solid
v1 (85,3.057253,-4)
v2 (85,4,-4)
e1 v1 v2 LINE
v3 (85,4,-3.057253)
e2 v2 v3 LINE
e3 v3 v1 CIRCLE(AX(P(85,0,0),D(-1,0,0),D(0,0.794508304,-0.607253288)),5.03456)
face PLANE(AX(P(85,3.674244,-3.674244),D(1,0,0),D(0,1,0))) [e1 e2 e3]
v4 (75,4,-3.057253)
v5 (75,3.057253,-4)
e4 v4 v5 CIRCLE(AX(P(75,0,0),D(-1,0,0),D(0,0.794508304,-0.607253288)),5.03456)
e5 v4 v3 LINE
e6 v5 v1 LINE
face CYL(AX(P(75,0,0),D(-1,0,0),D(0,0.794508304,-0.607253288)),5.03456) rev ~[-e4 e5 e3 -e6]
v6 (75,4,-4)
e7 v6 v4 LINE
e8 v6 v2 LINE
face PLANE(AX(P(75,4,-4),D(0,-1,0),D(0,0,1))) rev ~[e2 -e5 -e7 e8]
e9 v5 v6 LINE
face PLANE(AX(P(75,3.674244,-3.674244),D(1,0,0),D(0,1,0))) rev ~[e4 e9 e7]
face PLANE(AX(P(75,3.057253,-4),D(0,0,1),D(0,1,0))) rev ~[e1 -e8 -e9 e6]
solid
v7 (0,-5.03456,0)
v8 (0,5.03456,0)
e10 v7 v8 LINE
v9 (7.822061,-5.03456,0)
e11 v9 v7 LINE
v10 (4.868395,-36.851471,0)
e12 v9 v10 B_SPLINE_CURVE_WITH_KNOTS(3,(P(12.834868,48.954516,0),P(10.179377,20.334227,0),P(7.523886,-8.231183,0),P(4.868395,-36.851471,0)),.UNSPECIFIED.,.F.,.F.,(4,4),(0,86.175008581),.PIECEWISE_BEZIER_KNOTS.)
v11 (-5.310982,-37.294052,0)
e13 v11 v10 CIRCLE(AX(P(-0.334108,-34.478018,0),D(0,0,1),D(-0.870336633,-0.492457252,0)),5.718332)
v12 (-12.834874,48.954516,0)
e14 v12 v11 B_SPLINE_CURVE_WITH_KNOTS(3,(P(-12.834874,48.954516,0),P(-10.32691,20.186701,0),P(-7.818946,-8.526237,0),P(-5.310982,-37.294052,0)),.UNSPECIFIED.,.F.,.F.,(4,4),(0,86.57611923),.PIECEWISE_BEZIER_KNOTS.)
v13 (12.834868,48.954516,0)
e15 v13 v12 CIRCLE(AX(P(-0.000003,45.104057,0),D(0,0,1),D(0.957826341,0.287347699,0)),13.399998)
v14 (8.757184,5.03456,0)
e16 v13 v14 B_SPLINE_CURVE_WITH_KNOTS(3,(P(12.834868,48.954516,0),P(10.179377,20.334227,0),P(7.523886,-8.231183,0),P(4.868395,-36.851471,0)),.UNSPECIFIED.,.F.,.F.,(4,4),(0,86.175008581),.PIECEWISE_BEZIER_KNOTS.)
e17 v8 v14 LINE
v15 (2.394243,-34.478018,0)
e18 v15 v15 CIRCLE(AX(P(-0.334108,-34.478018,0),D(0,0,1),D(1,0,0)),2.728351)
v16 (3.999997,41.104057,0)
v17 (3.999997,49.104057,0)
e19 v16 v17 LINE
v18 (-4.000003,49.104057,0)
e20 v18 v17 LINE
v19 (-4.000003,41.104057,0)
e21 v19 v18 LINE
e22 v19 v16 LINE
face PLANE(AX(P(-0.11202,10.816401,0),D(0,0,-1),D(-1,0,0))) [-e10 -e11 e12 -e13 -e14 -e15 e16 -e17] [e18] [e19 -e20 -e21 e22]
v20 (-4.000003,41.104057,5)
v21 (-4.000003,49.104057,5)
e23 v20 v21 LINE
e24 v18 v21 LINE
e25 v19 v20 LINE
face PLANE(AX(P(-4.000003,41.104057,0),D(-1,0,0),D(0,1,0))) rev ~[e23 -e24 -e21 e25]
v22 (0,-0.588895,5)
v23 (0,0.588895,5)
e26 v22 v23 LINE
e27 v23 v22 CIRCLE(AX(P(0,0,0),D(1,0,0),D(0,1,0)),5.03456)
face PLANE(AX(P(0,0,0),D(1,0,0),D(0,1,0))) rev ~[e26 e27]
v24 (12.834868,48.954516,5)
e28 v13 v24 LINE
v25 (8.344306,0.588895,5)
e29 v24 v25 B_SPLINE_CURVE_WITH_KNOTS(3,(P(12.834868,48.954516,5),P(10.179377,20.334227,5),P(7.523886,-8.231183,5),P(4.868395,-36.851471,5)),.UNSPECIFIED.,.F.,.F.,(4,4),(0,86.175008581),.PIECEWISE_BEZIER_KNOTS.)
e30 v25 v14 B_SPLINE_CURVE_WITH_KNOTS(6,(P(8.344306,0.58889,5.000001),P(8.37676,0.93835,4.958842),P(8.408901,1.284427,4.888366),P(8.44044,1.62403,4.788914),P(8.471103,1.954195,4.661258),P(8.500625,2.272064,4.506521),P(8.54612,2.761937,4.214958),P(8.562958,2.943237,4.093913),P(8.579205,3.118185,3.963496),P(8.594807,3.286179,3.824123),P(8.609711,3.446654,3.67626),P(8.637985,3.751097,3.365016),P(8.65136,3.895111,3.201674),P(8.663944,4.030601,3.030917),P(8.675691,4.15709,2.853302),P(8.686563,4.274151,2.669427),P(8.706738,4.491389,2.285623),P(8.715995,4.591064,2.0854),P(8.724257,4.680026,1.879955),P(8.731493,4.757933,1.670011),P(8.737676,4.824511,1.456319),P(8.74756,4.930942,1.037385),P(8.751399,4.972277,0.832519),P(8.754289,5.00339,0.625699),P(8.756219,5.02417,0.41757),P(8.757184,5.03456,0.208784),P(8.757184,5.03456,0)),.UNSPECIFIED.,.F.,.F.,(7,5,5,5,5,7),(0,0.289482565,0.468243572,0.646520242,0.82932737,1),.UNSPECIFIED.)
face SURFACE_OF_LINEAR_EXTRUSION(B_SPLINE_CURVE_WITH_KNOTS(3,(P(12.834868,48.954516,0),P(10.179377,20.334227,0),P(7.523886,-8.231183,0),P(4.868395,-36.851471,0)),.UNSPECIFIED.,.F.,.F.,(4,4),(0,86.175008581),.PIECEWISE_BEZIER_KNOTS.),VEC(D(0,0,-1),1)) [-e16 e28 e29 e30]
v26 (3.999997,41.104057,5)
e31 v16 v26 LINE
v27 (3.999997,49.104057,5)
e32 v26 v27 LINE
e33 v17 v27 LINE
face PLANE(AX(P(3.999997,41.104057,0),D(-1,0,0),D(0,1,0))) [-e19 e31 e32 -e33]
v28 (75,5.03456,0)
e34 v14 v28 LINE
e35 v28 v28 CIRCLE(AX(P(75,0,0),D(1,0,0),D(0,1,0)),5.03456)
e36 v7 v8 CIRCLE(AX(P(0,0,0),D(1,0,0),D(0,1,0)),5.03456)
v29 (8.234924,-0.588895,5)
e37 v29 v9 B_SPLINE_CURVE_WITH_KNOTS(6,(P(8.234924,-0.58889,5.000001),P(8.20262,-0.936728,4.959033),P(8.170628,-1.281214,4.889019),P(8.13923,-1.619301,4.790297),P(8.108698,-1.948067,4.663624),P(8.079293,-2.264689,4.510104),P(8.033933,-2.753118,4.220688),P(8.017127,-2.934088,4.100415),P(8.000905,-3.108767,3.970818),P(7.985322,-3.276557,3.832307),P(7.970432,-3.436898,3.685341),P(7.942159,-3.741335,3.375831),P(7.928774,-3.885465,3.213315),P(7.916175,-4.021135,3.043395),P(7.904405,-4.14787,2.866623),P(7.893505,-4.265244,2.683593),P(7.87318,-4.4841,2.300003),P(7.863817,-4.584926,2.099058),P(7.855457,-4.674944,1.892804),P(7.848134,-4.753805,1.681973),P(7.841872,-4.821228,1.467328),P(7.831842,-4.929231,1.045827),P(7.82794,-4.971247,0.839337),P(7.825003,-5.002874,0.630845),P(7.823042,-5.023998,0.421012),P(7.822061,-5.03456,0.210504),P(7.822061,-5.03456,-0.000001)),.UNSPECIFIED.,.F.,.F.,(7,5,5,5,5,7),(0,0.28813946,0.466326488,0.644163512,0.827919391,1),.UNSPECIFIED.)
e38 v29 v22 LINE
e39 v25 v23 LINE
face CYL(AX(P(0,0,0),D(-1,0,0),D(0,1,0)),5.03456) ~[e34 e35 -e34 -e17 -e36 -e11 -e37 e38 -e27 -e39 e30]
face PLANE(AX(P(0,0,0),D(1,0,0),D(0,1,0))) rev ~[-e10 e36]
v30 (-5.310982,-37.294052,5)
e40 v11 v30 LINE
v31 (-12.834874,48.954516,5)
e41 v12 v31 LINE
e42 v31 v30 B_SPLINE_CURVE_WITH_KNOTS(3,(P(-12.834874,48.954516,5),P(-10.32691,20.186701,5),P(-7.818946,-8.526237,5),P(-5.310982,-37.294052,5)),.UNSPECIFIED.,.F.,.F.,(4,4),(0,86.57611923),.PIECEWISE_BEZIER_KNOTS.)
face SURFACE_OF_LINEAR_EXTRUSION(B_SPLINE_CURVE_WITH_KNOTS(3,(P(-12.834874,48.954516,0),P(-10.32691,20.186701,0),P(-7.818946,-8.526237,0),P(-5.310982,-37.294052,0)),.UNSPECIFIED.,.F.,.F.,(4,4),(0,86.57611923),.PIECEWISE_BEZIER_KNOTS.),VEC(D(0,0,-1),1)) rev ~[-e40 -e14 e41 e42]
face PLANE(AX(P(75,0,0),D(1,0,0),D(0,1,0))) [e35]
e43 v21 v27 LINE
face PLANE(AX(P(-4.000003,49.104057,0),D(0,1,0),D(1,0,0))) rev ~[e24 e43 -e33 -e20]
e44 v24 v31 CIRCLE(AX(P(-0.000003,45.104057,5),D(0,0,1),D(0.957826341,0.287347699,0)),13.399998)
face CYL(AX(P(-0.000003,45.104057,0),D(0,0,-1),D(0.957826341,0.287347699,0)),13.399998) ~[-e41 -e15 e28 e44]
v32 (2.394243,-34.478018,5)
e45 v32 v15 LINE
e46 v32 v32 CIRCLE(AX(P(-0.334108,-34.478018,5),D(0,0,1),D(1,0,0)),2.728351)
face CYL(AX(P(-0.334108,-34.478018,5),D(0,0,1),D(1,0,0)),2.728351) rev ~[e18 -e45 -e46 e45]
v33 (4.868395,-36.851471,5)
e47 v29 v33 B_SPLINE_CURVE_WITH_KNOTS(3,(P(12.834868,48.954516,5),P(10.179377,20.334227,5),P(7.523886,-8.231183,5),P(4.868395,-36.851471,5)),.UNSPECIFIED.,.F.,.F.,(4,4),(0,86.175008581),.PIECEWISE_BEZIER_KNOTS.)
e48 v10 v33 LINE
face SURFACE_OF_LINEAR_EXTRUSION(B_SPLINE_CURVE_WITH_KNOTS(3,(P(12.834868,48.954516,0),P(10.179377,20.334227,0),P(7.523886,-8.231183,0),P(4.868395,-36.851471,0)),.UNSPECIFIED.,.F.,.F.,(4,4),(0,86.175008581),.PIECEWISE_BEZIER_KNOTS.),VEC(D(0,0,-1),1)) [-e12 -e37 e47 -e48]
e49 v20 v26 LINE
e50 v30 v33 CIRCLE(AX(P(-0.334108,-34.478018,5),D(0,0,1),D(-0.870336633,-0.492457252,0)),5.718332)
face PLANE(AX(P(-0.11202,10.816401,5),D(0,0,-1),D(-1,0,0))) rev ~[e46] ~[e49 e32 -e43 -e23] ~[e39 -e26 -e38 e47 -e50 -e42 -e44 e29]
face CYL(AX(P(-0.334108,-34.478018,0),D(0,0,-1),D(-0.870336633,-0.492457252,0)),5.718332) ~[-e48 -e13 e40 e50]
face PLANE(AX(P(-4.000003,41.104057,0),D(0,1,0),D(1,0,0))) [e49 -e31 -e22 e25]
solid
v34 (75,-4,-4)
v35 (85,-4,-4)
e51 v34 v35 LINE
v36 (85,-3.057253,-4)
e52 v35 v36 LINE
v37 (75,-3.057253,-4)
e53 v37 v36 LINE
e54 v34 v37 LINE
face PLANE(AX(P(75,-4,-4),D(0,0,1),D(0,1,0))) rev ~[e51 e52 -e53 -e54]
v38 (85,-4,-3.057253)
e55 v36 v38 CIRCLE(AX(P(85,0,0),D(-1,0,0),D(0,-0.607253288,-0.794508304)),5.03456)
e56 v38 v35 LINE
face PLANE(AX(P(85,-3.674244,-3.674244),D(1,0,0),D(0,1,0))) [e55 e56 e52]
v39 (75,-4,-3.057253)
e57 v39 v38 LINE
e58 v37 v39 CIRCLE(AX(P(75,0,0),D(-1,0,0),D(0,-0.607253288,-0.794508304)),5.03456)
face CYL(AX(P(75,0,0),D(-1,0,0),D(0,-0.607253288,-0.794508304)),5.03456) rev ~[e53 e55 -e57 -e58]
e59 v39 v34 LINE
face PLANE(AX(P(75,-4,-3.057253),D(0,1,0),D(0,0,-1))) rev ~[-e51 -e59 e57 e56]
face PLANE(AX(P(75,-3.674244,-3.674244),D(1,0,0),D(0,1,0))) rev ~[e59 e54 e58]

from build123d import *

# Parameters (mm, degrees)
F0_R     = 5.0345603454
F1_DEPTH = 75
F3_W     = 8
F3_H     = 8
F4_DEPTH = 5
F6_DEPTH = 10
F7_R     = 2.7283514887
F8_DEPTH = 25


with BuildPart() as f1:
    # F0 (on Right) → F1 (new body)
    with BuildSketch(Plane.YZ):
        Circle(F0_R)
    extrude(amount=F1_DEPTH)

    # F3 (on Top) → F4 (join)
    with BuildSketch(Plane.XY):
        with BuildLine():
            add(Edge.make_bspline(
                [(12.8348679437, 48.9545158337), (10.1793770282, 20.3342274985), (7.5238861127, -8.231182894), (4.8683951972, -36.8514712291)],
                knots=[0, 0, 0, 0, 86.1750085805, 86.1750085805, 86.1750085805, 86.1750085805], degree=3))
            ThreePointArc((12.8348679437, 48.9545158337), (-2.794e-06, 58.504055005), (-12.8348735316, 48.9545158337))
            add(Edge.make_bspline(
                [(-12.8348735316, 48.9545158337), (-10.3269097443, 20.1867005239), (-7.8189459569, -8.5262368434), (-5.3109821696, -37.2940521532)],
                knots=[0, 0, 0, 0, 86.5761192305, 86.5761192305, 86.5761192305, 86.5761192305], degree=3))
            ThreePointArc((-5.3109821696, -37.2940521532), (-0.0857201671, -40.1909529666), (4.8683951972, -36.8514712291))
        make_face()
        with Locations((-2.794e-06, 45.1040573379)):
            Rectangle(F3_W, F3_H, mode=Mode.SUBTRACT)
    extrude(amount=F4_DEPTH)

    # F7 (on face) → F8 (cut)
    with BuildSketch(Plane.XY.offset(5)):
        with Locations((-0.3341082492, -34.4780180346)):
            Circle(F7_R)
    extrude(amount=-F8_DEPTH, mode=Mode.SUBTRACT)


with BuildPart() as f6:
    # F5 (on face) → F6 (new body)
    with BuildSketch(Plane.YZ.offset(75)):
        with BuildLine():
            Line((3.0572533215, -4), (4, -4))
            Line((4, -4), (4, -3.0572533215))
            ThreePointArc((4, -3.0572533215), (3.5599717605, -3.5599717605), (3.0572533215, -4))
        make_face()
    extrude(amount=F6_DEPTH)


with BuildPart() as f6b:
    # F5 (on face) → F6, piece 2 (new body)
    with BuildSketch(Plane.YZ.offset(75)):
        with BuildLine():
            Line((-4, -4), (-3.0572533215, -4))
            ThreePointArc((-3.0572533215, -4), (-3.5599717605, -3.5599717605), (-4, -3.0572533215))
            Line((-4, -3.0572533215), (-4, -4))
        make_face()
    extrude(amount=F6_DEPTH)


solid = Compound([f1.part, f6.part, f6b.part])
